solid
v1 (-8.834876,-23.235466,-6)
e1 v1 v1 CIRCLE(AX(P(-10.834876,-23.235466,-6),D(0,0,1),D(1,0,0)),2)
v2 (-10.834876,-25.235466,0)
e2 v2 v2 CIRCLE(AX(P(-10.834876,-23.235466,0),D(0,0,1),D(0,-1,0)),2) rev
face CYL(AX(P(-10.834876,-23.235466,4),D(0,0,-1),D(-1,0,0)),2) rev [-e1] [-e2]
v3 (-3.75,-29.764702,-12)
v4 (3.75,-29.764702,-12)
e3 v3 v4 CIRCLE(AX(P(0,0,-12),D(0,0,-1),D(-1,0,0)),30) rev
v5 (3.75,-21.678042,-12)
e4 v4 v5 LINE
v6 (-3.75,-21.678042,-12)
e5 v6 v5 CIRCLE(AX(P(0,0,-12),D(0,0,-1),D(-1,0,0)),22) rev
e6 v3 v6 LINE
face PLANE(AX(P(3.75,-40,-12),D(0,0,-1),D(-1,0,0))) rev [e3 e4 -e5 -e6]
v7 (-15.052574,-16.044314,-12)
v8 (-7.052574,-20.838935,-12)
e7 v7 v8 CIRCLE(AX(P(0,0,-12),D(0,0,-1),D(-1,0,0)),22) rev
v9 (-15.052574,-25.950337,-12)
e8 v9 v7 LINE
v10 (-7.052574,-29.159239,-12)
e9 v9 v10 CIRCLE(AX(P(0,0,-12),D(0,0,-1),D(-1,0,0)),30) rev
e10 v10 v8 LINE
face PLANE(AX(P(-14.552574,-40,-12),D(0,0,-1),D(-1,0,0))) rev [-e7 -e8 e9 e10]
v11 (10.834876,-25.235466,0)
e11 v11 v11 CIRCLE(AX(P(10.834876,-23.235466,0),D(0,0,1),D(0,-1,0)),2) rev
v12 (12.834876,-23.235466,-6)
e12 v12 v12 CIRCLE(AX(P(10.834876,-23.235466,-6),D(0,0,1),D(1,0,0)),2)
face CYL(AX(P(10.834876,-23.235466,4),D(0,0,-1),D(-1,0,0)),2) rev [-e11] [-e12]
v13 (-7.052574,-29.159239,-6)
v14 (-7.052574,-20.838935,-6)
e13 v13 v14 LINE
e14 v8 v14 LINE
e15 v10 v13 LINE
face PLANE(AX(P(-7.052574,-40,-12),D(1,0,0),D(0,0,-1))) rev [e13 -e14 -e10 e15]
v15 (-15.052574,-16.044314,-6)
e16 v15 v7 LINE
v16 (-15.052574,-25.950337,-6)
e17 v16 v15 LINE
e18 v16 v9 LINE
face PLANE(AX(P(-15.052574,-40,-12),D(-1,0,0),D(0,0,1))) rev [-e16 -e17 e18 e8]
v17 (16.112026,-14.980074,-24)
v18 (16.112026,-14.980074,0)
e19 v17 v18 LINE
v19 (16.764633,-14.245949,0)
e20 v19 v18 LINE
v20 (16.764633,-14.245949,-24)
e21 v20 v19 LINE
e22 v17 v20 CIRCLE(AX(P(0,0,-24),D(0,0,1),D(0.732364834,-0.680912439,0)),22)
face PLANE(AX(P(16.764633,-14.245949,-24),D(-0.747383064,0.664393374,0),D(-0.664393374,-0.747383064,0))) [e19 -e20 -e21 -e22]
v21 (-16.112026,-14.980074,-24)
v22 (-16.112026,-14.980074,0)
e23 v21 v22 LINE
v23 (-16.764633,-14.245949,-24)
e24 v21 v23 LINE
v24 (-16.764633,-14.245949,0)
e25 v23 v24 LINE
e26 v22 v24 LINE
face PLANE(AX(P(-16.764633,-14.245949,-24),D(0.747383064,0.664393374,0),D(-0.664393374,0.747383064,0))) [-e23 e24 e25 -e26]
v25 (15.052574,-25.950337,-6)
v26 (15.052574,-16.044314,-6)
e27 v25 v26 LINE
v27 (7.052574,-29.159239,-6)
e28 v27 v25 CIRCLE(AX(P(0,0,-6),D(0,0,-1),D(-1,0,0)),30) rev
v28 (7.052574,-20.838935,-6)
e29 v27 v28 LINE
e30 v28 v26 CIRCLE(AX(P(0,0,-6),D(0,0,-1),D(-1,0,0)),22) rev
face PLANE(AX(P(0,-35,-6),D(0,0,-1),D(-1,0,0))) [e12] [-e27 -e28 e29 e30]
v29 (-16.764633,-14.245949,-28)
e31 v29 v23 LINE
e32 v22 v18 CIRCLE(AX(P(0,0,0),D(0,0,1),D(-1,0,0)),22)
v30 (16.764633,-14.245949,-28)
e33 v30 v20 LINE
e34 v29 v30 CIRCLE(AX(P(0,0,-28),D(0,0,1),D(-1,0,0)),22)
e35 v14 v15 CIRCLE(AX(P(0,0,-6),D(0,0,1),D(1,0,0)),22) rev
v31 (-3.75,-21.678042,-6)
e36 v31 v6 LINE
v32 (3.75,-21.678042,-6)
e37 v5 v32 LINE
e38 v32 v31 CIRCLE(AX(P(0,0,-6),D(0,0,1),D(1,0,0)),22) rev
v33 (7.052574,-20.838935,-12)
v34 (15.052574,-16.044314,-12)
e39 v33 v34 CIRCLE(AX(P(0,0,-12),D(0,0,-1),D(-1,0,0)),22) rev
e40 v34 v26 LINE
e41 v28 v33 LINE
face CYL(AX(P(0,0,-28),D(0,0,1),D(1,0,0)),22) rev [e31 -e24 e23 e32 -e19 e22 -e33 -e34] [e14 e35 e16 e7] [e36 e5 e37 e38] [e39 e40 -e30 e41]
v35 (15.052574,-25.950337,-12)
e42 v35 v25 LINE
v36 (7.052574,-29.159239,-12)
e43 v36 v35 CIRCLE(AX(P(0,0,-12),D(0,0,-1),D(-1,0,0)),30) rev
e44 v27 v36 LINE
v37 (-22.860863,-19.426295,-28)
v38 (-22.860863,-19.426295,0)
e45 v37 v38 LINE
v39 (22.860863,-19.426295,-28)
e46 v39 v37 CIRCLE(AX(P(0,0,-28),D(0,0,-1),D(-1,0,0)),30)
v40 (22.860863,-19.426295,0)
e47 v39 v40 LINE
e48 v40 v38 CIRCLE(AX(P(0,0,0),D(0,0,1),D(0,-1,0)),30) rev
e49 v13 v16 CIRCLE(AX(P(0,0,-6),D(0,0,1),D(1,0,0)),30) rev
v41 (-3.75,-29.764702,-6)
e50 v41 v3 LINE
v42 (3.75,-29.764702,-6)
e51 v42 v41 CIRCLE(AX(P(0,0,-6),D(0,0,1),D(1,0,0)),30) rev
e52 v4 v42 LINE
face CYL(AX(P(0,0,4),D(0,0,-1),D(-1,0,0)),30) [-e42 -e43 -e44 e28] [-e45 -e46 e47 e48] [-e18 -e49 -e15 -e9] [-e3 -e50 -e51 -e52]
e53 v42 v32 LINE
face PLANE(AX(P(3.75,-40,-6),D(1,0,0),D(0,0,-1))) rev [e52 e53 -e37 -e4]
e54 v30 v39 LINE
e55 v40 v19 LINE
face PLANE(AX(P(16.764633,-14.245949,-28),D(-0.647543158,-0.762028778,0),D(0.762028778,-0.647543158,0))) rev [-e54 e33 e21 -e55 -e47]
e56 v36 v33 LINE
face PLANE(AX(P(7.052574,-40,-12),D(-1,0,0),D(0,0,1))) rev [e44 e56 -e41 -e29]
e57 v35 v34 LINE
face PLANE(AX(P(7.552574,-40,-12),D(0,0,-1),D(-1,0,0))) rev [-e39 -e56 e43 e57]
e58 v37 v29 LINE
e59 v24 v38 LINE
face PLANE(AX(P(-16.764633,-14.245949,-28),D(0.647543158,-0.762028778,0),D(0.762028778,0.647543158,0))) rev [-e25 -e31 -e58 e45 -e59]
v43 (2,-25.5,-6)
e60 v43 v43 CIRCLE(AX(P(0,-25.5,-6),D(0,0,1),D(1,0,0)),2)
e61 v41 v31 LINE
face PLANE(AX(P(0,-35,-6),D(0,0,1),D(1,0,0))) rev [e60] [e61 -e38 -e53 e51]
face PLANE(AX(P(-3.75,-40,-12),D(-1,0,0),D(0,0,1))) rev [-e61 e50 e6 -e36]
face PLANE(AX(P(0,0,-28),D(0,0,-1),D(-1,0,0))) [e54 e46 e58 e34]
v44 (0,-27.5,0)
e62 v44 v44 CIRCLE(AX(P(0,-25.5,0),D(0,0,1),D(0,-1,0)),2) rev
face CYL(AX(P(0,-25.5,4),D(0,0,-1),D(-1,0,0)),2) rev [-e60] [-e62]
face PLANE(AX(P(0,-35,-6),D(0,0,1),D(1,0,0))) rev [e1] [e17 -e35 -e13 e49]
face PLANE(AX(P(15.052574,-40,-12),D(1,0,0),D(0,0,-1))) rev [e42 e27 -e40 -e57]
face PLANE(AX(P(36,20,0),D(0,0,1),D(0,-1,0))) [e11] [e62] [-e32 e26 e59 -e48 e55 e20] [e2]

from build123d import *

# Parameters (mm, degrees)
SKETCH_1_R                = 20
SKETCH_1_R_2              = 2
EXTRUDE_1_DEPTH           = 4
EXTRUDE_START             = -4
EXTRUDE_2_DEPTH           = 4
FILLET_2_R                = 5
FILLET_3_R                = 5
SKETCH_3_R                = 58.160089131
SKETCH_3_R_2              = 39.60449563
CUT_EXTRUDE_1_DEPTH       = 4
FILLET_4_R                = 8
EXTRUDE_3_DEPTH           = 4
SKETCH_5_R                = 2
CUT_EXTRUDE_2_DEPTH       = 4
SKETCH_6_R                = 2
CUT_EXTRUDE_3_DEPTH       = 10
EXTRUDE_4_DEPTH           = 4
EXTRUDE_6_DEPTH           = 4
CUT_EXTRUDE_6_DEPTH       = 4
FILLET_6_R                = 10
FILLET_7_R                = 10
FILLET_8_R                = 10
SKETCH_11_R               = 2
EXTRUDE_7_DEPTH           = 4
SKETCH_12_R               = 54.16696545
SKETCH_12_R_2             = 30
CUT_EXTRUDE_7_DEPTH       = 4
FILLET_10_R               = 5
FILLET_11_R               = 5
SKETCH_13_R               = 2
CUT_EXTRUDE_8_DEPTH       = 4
EXTRUDE_START_2           = 28
EXTRUDE_8_DEPTH           = 28
EXTRUDE_START_3           = -28
EXTRUDE_9_DEPTH           = 28
EXTRUDE_10_DEPTH          = 4
CUT_EXTRUDE_START         = -10
SKETCH_17_R               = 2
CUT_EXTRUDE_9_DEPTH       = 10
CUT_EXTRUDE_11_DEPTH      = 35
CUT_EXTRUDE_12_DEPTH      = 36
CUT_EXTRUDE_12_DEPTH_BACK = 36
SKETCH_19_W               = 5.49642493
SKETCH_19_H               = 52.333928513
CUT_EXTRUDE_13_DEPTH      = 40


with BuildPart() as part:
    # 草图1 → 凸台-拉伸1 (new body)
    with BuildSketch(Plane.XY):
        Circle(SKETCH_1_R)
        with Locations((-15, 0)):
            Circle(SKETCH_1_R_2, mode=Mode.SUBTRACT)
        with Locations((15, 0)):
            Circle(SKETCH_1_R_2, mode=Mode.SUBTRACT)
        with Locations((-7.5, 12.990381057)):
            Circle(SKETCH_1_R_2, mode=Mode.SUBTRACT)
        with Locations((-7.5, -12.990381057)):
            Circle(SKETCH_1_R_2, mode=Mode.SUBTRACT)
        with Locations((7.5, -12.990381057)):
            Circle(SKETCH_1_R_2, mode=Mode.SUBTRACT)
        with Locations((7.5, 12.990381057)):
            Circle(SKETCH_1_R_2, mode=Mode.SUBTRACT)
    extrude(amount=EXTRUDE_1_DEPTH)

    # 草图2 → 凸台-拉伸2 (add)
    with BuildSketch(Plane.XY.offset(4).offset(EXTRUDE_START)):
        with BuildLine():
            add(Edge.make_bspline(
                [(-31.652235688, -31.652235688), (-33.388516019, -22.659494294), (-23.392443281, -20.962737075), (-16.1166561, -16.161254448), (-15.240575556, -12.950863166)],
                knots=[0, 0, 0, 0, 0.575012139, 0.86884139, 0.86884139, 0.86884139, 0.86884139], degree=3))
            ThreePointArc((-31.652235688, -31.652235688), (0, -44.76302099), (31.652235688, -31.652235688))
            add(Edge.make_bspline(
                [(31.652235688, -31.652235688), (33.388516019, -22.659494294), (23.392443281, -20.962737075), (16.1166561, -16.161254448), (15.240575556, -12.950863166)],
                knots=[0, 0, 0, 0, 0.575012139, 0.86884139, 0.86884139, 0.86884139, 0.86884139], degree=3))
            ThreePointArc((15.240575556, -12.950863166), (0, -20), (-15.240575556, -12.950863166))
        make_face()
    extrude(amount=EXTRUDE_2_DEPTH)

    # 圆角2
    fillet_2_edges = [part.edges().sort_by_distance(p)[0] for p in [
        (-31.652235688, -31.652235688, 2),
    ]]
    fillet(fillet_2_edges, radius=FILLET_2_R)

    # 圆角3
    fillet_3_edges = [part.edges().sort_by_distance(p)[0] for p in [
        (31.652235688, -31.652235688, 2),
    ]]
    fillet(fillet_3_edges, radius=FILLET_3_R)

    # 草图3 → 切除-拉伸1 (cut)
    with BuildSketch(Plane(origin=(0, 0, 0), x_dir=(-1, 0, 0), z_dir=(0, 0, -1))):
        Circle(SKETCH_3_R)
        Circle(SKETCH_3_R_2, mode=Mode.SUBTRACT)
    extrude(amount=-CUT_EXTRUDE_1_DEPTH, mode=Mode.SUBTRACT)

    # 圆角4
    fillet_4_edges = [part.edges().sort_by_distance(p)[0] for p in [
        (30.87581987, -24.803221997, 2),
        (-30.87581987, -24.803221997, 2),
    ]]
    fillet(fillet_4_edges, radius=FILLET_4_R)

    # 草图4 → 凸台-拉伸3 (add)
    with BuildSketch(Plane(origin=(0, 0, 0), x_dir=(-1, 0, 0), z_dir=(0, 0, -1))):
        with BuildLine():
            Line((-22.183787779, -32.808468935), (-22.405322857, -33.136105801))
            ThreePointArc((-22.405322857, -33.136105801), (0.038199329, -39.99998176), (22.468570811, -33.093251967))
            Line((22.468570811, -33.093251967), (22.183787779, -32.808468935))
            ThreePointArc((22.183787779, -32.808468935), (0, -39.60449563), (-22.183787779, -32.808468935))
        make_face()
    extrude(amount=-EXTRUDE_3_DEPTH)

    # 草图5 → 切除-拉伸2 (cut)
    with BuildSketch(Plane(origin=(0, 0, 0), x_dir=(-1, 0, 0), z_dir=(0, 0, -1))):
        with Locations((-15.848184815, -33.986542014)):
            Circle(SKETCH_5_R)
        with Locations((0, -37.5)):
            Circle(SKETCH_5_R)
        with Locations(Location((15.848184815, -33.986542014, 0), (0, 0, 180))):
            Circle(SKETCH_5_R)
    extrude(amount=-CUT_EXTRUDE_2_DEPTH, mode=Mode.SUBTRACT)

    # 草图6 → 切除-拉伸3 (cut)
    with BuildSketch(Plane(origin=(0, 0, 0), x_dir=(-1, 0, 0), z_dir=(0, 0, -1))):
        with Locations((0.038199329, -29.99998176)):
            Circle(SKETCH_6_R)
    extrude(amount=-CUT_EXTRUDE_3_DEPTH, mode=Mode.SUBTRACT)

    # 草图7 → 凸台-拉伸4 (add)
    with BuildSketch(Plane.XY.offset(4)):
        with BuildLine():
            Line((-22.468570811, -33.093251967), (-23.907156981, -34.531838137))
            ThreePointArc((-23.907156981, -34.531838137), (-0.231167262, -41.999363825), (23.525589, -34.792911091))
            Line((23.525589, -34.792911091), (22.405322857, -33.136105801))
            Line((22.405322857, -33.136105801), (22.183787779, -32.808468935))
            ThreePointArc((22.183787779, -32.808468935), (0, -39.60449563), (-22.183787779, -32.808468935))
            Line((-22.183787779, -32.808468935), (-22.468570811, -33.093251967))
        make_face()
    extrude(amount=-EXTRUDE_4_DEPTH)

    # 草图8 → 凸台-拉伸6 (add)
    with BuildSketch(Plane(origin=(0, 0, 0), x_dir=(-1, 0, 0), z_dir=(0, 0, -1))):
        with BuildLine():
            Line((-25.678439695, -25.558394246), (-20.516854663, -32.863070329))
            Line((-20.516854663, -32.863070329), (-23.525589, -34.792911091))
            add(Edge.make_bspline(
                [(-23.525589, -34.792911091), (-26.001835591, -30.056258517), (-25.678439695, -25.558394246)],
                knots=[0, 0, 0, 0.47951431, 0.47951431, 0.47951431], degree=2))
        make_face()
        with BuildLine():
            Line((20.516854663, -32.863070329), (23.525589, -34.792911091))
            add(Edge.make_bspline(
                [(23.525589, -34.792911091), (26.001835591, -30.056258517), (25.678439695, -25.558394246)],
                knots=[0, 0, 0, 0.47951431, 0.47951431, 0.47951431], degree=2))
            Line((25.678439695, -25.558394246), (20.516854663, -32.863070329))
        make_face()
    extrude(amount=-EXTRUDE_6_DEPTH)

    # 草图9 → 切除-拉伸6 (cut)
    with BuildSketch(Plane(origin=(0, 0, 0), x_dir=(-1, 0, 0), z_dir=(0, 0, -1))):
        Polygon((23.742659966, -34.367341122), (22.906265437, -35.20373565), (24.433492861, -34.374984505), align=None)
    extrude(amount=-CUT_EXTRUDE_6_DEPTH, mode=Mode.SUBTRACT)

    # 圆角6
    fillet_6_edges = [part.edges().sort_by_distance(p)[0] for p in [
        (23.525589, -34.792911091, 2),
    ]]
    fillet(fillet_6_edges, radius=FILLET_6_R)

    # 圆角7
    # the kernel refuses this fillet: 10 mm, written as the material it takes off along each edge
    with BuildSketch(Plane(origin=(-23.742659966, -34.367341122, 10.292446297), x_dir=(0.7071067812003878, -0.7071067811727072, 0), z_dir=(0, 0, -1))) as fillet_7_piece_1:
        with BuildLine():
            CenterArc((1.956172782, -9.970053017), FILLET_7_R, 94.435296014, 20.980736708)
            Line((-2.335706132, -0.937900705), (-2.42154371, -0.757257658))
            ThreePointArc((-2.42154371, -0.757257658), (-1.256201499, -0.248323162), (-0.06365122, 0.189600955))
            Line((-0.06365122, 0.189600955), (0, 0.2))
            ThreePointArc((0, 0.2), (0.591420243, 0.2), (1.16737384, 0.19940106))
            Line((1.16737384, 0.19940106), (1.182840486, 0))
        make_face()
    extrude(amount=16.584892581, mode=Mode.SUBTRACT)

    # 圆角8
    fillet_8_edges = [part.edges().sort_by_distance(p)[0] for p in [
        (-22.906265437, -35.20373565, 2),
    ]]
    fillet(fillet_8_edges, radius=FILLET_8_R)

    # 草图11 → 凸台-拉伸7 (add)
    with BuildSketch(Plane(origin=(0, 0, 0), x_dir=(-1, 0, 0), z_dir=(0, 0, -1))):
        with Locations((0.038199329, -29.99998176)):
            Circle(SKETCH_11_R)
        with Locations((0, -37.5)):
            Circle(SKETCH_11_R)
        with Locations((15.848184815, -33.986542014)):
            Circle(SKETCH_11_R)
        with Locations((-15.848184815, -33.986542014)):
            Circle(SKETCH_11_R)
    extrude(amount=-EXTRUDE_7_DEPTH)

    # 草图12 → 切除-拉伸7 (cut)
    with BuildSketch(Plane(origin=(0, 0, 0), x_dir=(-1, 0, 0), z_dir=(0, 0, -1))):
        Circle(SKETCH_12_R)
        Circle(SKETCH_12_R_2, mode=Mode.SUBTRACT)
    extrude(amount=-CUT_EXTRUDE_7_DEPTH, mode=Mode.SUBTRACT)

    # 圆角10
    fillet_10_edges = [part.edges().sort_by_distance(p)[0] for p in [
        (-22.533836729, -19.804701519, 2),
    ]]
    fillet(fillet_10_edges, radius=FILLET_10_R)

    # 圆角11
    fillet_11_edges = [part.edges().sort_by_distance(p)[0] for p in [
        (22.533836729, -19.804701519, 2),
    ]]
    fillet(fillet_11_edges, radius=FILLET_11_R)

    # 草图13 → 切除-拉伸8 (cut)
    with BuildSketch(Plane(origin=(0, 0, 0), x_dir=(-1, 0, 0), z_dir=(0, 0, -1))):
        with Locations((0, -25.5)):
            Circle(SKETCH_13_R)
        with Locations((-10.834875534, -23.235465565)):
            Circle(SKETCH_13_R)
        with Locations(Location((10.834875534, -23.235465565, 0), (0, 0, 180))):
            Circle(SKETCH_13_R)
    extrude(amount=-CUT_EXTRUDE_8_DEPTH, mode=Mode.SUBTRACT)

    # 草图14 → 凸台-拉伸8 (add)
    with BuildSketch(Plane(origin=(0, 0, 0), x_dir=(-1, 0, 0), z_dir=(0, 0, -1)).offset(EXTRUDE_START_2)):
        with BuildLine():
            Line((-16.764633111, -14.245949482), (-22.860863333, -19.426294749))
            ThreePointArc((-22.860863333, -19.426294749), (0, -30), (22.860863333, -19.426294749))
            Line((22.860863333, -19.426294749), (16.764633111, -14.245949482))
            ThreePointArc((16.764633111, -14.245949482), (0, -22), (-16.764633111, -14.245949482))
        make_face()
    extrude(amount=-EXTRUDE_8_DEPTH)

    # 草图15 → 凸台-拉伸9 (add)
    with BuildSketch(Plane.XY.offset(4).offset(EXTRUDE_START_3)):
        with BuildLine():
            Line((-22.860863333, -19.426294749), (-16.764633111, -14.245949482))
            Line((-16.764633111, -14.245949482), (-16.112026358, -14.980073652))
            Line((-16.112026358, -14.980073652), (-17.163654071, -24.605060027))
            ThreePointArc((-17.163654071, -24.605060027), (-20.17908325, -22.19920267), (-22.860863333, -19.426294749))
        make_face()
        with BuildLine():
            Line((16.112026358, -14.980073652), (17.163654071, -24.605060027))
            ThreePointArc((17.163654071, -24.605060027), (20.17908325, -22.19920267), (22.860863333, -19.426294749))
            Line((22.860863333, -19.426294749), (16.764633111, -14.245949482))
            Line((16.764633111, -14.245949482), (16.112026358, -14.980073652))
        make_face()
    extrude(amount=EXTRUDE_9_DEPTH)

    # 草图16 → 凸台-拉伸10 (add)
    with BuildSketch(Plane.XY.offset(4)):
        Polygon((22.860863333, -19.426294749), (12.832928653, -10.904936129), (17.846895993, -20.488091499), align=None)
        Polygon((-17.846895993, -20.488091499), (-22.860863333, -19.426294749), (-12.832928653, -10.904936129), align=None)
    extrude(amount=-EXTRUDE_10_DEPTH)

    # 草图17 → 切除-拉伸9 (cut)
    with BuildSketch(Plane.XY.offset(4).offset(CUT_EXTRUDE_START)):
        with Locations((-10.834875534, -23.235465565)):
            Circle(SKETCH_17_R)
        with Locations(Location((0, -25.5, 0), (0, 0, 180))):
            Circle(SKETCH_17_R)
        with Locations(Location((10.834875534, -23.235465565, 0), (0, 0, 180))):
            Circle(SKETCH_17_R)
    extrude(amount=CUT_EXTRUDE_9_DEPTH, mode=Mode.SUBTRACT)

    # 草图18 → 切除-拉伸11 (cut)
    with BuildSketch(Plane(origin=(0, 0, 0), x_dir=(1, 0, 0), z_dir=(0, 1, 0))):
        Polygon((13.552574472, 6), (11.552574472, 6), (8.552574472, 6), (8.552574472, 9), (11.552574472, 9), (13.552574472, 9), align=None)
        Polygon((-2, 9), (-2.5, 9), (-2.5, 6), (-2, 6), (0, 6), (2, 6), (2.5, 6), (2.5, 9), (2, 9), align=None)
        Polygon((-13.552574472, 9), (-13.552574472, 6), (-11.552574472, 6), (-8.552574472, 6), (-8.552574472, 9), (-11.552574472, 9), align=None)
    extrude(amount=-CUT_EXTRUDE_11_DEPTH, mode=Mode.SUBTRACT)

    # 草图19 → 切除-拉伸12 (cut, two sides: drawn at the far end of the back side and taken through both)
    with BuildSketch(Plane(origin=(0, 0, 0), x_dir=(0, 0, -1), z_dir=(1, 0, 0)).offset(-CUT_EXTRUDE_12_DEPTH_BACK)):
        with Locations((-2.748212465, -6.166964257)):
            Rectangle(SKETCH_19_W, SKETCH_19_H)
    extrude(amount=CUT_EXTRUDE_12_DEPTH + CUT_EXTRUDE_12_DEPTH_BACK, mode=Mode.SUBTRACT)

    # 草图20 → 切除-拉伸13 (cut)
    with BuildSketch(Plane(origin=(0, 0, 0), x_dir=(1, 0, 0), z_dir=(0, 1, 0))):
        Polygon((-7.552574472, 12), (-7.052574472, 12), (-7.052574472, 6), (-7.552574472, 6), (-14.552574472, 6), (-15.052574472, 6), (-15.052574472, 12), (-14.552574472, 12), (-13.552574472, 12), (-8.552574472, 12), align=None)
        Polygon((2.5, 6), (3.75, 6), (3.75, 12), (-3.75, 12), (-3.75, 6), align=None)
        Polygon((15.052574472, 6), (14.552574472, 6), (7.552574472, 6), (7.052574472, 6), (7.052574472, 12), (7.552574472, 12), (8.552574472, 12), (13.552574472, 12), (14.552574472, 12), (15.052574472, 12), align=None)
    extrude(amount=-CUT_EXTRUDE_13_DEPTH, mode=Mode.SUBTRACT)


solid = part.part
